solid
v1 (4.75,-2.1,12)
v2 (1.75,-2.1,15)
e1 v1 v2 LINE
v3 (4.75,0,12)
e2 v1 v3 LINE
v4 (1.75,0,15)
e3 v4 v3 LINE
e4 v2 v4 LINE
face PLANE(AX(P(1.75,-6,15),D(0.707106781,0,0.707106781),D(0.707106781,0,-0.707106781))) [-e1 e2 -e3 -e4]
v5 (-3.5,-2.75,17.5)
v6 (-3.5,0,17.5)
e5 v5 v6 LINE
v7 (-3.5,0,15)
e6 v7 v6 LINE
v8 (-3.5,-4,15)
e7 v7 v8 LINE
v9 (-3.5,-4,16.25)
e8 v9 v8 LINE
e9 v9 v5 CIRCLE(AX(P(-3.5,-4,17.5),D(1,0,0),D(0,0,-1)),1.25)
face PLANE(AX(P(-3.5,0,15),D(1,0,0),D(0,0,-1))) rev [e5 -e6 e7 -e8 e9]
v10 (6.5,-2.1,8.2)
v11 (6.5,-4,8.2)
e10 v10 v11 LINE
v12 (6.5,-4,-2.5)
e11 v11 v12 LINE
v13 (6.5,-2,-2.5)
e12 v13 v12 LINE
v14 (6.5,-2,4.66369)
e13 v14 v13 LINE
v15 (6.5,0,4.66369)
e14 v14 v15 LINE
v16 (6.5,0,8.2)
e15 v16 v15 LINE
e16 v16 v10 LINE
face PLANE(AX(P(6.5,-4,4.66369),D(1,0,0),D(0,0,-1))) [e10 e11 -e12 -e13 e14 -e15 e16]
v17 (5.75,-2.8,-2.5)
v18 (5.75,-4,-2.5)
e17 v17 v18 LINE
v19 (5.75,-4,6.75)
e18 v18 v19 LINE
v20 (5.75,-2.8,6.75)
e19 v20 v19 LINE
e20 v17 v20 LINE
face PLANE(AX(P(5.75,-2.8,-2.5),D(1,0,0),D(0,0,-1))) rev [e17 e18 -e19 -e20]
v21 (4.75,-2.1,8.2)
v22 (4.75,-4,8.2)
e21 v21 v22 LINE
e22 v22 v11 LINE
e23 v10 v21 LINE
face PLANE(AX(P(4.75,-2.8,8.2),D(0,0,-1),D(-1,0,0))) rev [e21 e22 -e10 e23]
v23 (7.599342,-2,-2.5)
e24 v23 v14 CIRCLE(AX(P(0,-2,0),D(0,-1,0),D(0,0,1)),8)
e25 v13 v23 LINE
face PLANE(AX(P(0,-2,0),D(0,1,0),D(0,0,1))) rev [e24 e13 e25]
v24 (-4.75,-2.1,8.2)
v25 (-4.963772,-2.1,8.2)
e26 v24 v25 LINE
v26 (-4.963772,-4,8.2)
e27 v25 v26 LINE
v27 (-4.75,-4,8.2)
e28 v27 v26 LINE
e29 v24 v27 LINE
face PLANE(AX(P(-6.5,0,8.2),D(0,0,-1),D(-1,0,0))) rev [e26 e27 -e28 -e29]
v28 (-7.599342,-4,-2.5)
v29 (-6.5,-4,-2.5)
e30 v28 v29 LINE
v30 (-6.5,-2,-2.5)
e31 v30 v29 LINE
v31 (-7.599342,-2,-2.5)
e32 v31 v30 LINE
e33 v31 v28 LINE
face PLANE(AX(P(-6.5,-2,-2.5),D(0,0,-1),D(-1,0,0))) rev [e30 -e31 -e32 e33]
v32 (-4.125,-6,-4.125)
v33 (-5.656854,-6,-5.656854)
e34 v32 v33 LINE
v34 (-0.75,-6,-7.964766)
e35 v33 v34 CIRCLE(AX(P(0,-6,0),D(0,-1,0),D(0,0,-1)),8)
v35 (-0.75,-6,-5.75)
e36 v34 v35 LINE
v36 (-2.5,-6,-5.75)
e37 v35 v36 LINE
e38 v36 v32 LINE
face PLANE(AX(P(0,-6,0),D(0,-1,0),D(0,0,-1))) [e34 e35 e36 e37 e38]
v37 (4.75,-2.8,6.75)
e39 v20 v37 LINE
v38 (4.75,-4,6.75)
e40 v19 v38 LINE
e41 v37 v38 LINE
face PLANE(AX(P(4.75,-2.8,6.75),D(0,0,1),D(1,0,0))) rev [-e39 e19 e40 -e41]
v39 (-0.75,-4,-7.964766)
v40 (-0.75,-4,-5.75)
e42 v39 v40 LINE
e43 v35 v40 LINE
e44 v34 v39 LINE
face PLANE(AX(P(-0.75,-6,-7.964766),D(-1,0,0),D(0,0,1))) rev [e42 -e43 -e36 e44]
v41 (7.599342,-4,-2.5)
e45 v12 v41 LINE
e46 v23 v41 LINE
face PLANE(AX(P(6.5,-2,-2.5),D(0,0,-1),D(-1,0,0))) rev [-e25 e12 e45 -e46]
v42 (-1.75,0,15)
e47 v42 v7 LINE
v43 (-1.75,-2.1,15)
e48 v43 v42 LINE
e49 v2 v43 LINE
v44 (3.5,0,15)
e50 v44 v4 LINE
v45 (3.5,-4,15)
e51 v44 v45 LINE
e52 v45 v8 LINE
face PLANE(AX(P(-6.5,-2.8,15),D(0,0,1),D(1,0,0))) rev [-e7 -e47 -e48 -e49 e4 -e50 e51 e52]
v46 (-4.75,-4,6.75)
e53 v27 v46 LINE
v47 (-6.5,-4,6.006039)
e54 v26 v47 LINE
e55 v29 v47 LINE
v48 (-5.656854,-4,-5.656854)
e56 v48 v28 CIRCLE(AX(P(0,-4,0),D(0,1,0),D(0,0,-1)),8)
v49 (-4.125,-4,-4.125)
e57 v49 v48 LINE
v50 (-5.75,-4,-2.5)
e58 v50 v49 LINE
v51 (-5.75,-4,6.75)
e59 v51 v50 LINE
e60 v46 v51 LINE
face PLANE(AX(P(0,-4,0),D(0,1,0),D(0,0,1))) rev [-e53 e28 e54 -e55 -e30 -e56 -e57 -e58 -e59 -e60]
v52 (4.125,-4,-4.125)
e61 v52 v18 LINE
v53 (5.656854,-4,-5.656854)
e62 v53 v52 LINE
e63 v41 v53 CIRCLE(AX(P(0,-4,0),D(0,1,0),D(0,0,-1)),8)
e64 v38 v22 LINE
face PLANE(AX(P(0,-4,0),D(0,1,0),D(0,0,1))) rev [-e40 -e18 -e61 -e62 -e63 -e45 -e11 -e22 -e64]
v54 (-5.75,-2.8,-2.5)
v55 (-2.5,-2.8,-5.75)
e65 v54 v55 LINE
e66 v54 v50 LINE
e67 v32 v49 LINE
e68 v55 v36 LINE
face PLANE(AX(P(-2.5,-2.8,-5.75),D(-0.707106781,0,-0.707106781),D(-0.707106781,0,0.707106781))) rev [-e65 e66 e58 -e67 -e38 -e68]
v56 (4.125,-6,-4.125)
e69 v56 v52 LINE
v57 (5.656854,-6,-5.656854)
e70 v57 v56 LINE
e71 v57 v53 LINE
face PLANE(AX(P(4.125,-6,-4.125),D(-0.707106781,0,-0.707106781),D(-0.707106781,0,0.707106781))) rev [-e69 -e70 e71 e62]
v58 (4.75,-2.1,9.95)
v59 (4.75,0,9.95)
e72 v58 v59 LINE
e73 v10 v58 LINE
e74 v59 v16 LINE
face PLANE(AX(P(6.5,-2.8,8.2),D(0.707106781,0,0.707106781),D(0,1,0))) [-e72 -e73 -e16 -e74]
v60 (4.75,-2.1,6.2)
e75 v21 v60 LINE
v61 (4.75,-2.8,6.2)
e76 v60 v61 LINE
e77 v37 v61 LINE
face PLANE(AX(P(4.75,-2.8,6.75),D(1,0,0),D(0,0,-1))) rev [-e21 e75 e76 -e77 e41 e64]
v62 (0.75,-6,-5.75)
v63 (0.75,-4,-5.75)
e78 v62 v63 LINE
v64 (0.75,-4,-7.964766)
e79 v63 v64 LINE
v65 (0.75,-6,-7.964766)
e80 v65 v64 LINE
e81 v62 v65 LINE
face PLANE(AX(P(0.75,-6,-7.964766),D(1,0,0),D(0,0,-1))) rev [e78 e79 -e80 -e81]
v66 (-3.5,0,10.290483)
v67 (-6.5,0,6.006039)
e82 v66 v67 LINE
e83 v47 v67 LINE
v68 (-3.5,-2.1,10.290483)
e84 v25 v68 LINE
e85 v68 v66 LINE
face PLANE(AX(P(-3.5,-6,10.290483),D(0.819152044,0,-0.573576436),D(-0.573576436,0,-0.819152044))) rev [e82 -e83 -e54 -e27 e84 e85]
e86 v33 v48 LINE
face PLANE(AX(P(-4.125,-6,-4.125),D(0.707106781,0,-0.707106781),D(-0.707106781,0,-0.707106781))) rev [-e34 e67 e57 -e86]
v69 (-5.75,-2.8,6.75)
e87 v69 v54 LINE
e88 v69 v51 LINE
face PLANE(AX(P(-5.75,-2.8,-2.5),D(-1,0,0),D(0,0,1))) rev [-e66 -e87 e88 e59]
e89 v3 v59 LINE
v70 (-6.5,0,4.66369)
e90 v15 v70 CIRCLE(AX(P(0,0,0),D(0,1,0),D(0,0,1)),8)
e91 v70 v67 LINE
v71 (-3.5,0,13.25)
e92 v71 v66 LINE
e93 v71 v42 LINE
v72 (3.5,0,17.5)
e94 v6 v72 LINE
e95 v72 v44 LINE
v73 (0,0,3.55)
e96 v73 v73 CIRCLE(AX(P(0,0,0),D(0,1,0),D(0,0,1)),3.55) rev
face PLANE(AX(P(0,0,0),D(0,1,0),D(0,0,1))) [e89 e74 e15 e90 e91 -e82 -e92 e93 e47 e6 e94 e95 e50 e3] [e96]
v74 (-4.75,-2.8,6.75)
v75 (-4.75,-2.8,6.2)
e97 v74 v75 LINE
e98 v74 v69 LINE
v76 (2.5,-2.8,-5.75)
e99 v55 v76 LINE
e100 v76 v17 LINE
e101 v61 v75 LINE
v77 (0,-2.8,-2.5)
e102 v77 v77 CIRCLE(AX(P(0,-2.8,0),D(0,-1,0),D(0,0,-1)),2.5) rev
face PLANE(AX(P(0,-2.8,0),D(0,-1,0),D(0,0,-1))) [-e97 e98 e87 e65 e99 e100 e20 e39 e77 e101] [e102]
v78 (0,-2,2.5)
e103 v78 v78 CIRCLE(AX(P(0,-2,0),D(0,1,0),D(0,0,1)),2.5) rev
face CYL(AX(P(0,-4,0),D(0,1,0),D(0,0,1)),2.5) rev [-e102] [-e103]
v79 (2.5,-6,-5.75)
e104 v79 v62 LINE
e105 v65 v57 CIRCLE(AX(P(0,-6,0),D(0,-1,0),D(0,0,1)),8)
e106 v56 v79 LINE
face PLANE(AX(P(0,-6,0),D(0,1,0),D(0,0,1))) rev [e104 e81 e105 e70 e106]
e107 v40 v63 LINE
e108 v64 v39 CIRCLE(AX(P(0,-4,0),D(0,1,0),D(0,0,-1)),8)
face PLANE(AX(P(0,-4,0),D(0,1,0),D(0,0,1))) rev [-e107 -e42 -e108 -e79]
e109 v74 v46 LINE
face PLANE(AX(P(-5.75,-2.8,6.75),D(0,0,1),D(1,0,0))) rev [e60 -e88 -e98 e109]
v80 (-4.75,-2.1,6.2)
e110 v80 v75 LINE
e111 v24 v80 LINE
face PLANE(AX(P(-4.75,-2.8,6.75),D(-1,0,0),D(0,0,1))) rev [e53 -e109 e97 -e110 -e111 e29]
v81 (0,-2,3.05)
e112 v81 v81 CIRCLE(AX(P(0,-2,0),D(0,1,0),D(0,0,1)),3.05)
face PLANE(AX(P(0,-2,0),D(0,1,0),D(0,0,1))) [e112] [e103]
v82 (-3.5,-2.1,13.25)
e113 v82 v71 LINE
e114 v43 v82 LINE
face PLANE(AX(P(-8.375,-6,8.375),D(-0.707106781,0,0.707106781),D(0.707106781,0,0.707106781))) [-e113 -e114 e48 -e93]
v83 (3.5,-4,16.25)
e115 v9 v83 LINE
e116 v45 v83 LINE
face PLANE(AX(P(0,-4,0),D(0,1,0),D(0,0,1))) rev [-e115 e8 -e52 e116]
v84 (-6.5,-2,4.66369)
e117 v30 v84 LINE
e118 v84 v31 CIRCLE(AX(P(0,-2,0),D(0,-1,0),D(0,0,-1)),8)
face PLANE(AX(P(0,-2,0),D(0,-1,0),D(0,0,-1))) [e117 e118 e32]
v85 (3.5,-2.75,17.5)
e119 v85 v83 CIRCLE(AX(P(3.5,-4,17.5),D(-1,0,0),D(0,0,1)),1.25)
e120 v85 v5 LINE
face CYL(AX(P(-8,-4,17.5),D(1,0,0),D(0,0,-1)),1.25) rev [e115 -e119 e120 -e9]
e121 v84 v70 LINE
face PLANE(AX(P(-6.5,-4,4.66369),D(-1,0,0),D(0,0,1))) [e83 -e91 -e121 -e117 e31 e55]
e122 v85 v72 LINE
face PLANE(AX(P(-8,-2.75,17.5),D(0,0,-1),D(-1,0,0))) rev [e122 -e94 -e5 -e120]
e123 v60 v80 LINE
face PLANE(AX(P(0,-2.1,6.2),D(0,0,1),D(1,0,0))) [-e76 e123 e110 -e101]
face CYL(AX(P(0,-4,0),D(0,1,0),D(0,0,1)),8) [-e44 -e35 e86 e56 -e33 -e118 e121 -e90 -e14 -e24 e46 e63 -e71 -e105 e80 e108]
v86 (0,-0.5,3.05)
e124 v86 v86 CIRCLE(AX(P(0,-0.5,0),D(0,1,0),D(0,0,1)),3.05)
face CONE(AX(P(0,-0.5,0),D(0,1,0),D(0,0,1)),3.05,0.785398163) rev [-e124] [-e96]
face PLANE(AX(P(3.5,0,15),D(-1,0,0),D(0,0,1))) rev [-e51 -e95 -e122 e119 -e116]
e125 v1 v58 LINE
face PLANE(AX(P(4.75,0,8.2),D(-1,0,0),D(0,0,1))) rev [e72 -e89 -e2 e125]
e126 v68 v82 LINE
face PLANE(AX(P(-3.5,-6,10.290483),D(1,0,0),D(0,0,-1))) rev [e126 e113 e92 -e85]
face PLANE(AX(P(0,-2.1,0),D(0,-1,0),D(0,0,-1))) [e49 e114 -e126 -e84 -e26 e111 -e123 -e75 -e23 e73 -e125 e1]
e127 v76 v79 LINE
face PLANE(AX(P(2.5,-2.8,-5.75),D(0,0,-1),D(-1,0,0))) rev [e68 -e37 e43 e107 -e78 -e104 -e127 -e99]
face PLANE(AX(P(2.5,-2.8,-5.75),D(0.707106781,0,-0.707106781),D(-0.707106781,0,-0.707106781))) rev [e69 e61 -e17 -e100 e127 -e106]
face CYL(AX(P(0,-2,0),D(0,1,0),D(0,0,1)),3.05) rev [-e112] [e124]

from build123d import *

# Parameters (mm, degrees)
BOSS_EXTRUDE1_DEPTH      = 4
SKETCH2_R                = 2.5
CUT_EXTRUDE1_DEPTH       = 22.9089023
SKETCH3_R                = 3.05
CUT_EXTRUDE2_DEPTH       = 2
CUT_EXTRUDE3_DEPTH       = 1.2
CUT_EXTRUDE5_DEPTH       = 0.7
CUT_EXTRUDE8_START       = -2
CUT_EXTRUDE8_DEPTH       = 2
BOSS_EXTRUDE3_DEPTH      = 2
BOSS_EXTRUDE4_DEPTH      = 1.9
CUT_EXTRUDE10_DEPTH      = 22.9089023
CUT_EXTRUDE10_DEPTH_BACK = 22.9089023
CUT_EXTRUDE11_DEPTH      = 23.360679775
CUT_EXTRUDE12_DEPTH      = 24.837994882
CUT_EXTRUDE12_DEPTH_BACK = 24.837994882
CHAMFER1_SIZE            = 1.75
CUT_EXTRUDE13_DEPTH      = 24.837994882
CUT_EXTRUDE14_DEPTH      = 21.155644371
CHAMFER2_SIZE            = 0.5


with BuildPart() as part:
    # Sketch1 → Boss-Extrude1 (new body)
    with BuildSketch(Plane(origin=(0, 0, 0), x_dir=(1, 0, 0), z_dir=(0, 1, 0))):
        with BuildLine():
            Line((-6.5, -20), (6.5, -20))
            Line((6.5, -20), (6.5, -4.663689527))
            ThreePointArc((6.5, -4.663689527), (8, 0), (6.5, 4.663689527))
            ThreePointArc((6.5, 4.663689527), (0, 8), (-6.5, 4.663689527))
            ThreePointArc((-6.5, 4.663689527), (-8, 0), (-6.5, -4.663689527))
            Line((-6.5, -4.663689527), (-6.5, -20))
        make_face()
    extrude(amount=-BOSS_EXTRUDE1_DEPTH)

    # Sketch2 → Cut-Extrude1 (cut, through all)
    with BuildSketch(Plane(origin=(0, 0, 0), x_dir=(1, 0, 0), z_dir=(0, 1, 0))):
        with Locations(Location((0, 0, 0), (0, 0, 270))):
            Circle(SKETCH2_R)
    extrude(amount=-CUT_EXTRUDE1_DEPTH, mode=Mode.SUBTRACT)

    # Sketch3 → Cut-Extrude2 (cut)
    with BuildSketch(Plane(origin=(0, 0, 0), x_dir=(1, 0, 0), z_dir=(0, 1, 0))):
        with Locations(Location((0, 0, 0), (0, 0, 270))):
            Circle(SKETCH3_R)
    extrude(amount=-CUT_EXTRUDE2_DEPTH, mode=Mode.SUBTRACT)

    # Sketch4 → Cut-Extrude3 (cut)
    with BuildSketch(Plane.XZ.offset(4)):
        Polygon((2.5, -5.75), (-2.5, -5.75), (-5.75, -2.5), (-5.75, 6.75), (-4.75, 6.75), (-4.75, 8.2), (-6.010373569, 10), (-6.5, 10), (-6.5, 10.699259012), (-6.5, 15), (6.5, 15), (6.5, 10.699259012), (6.5, 10), (6.5, 8.2), (4.75, 8.2), (4.75, 6.75), (5.75, 6.75), (5.75, -2.5), align=None)
    extrude(amount=-CUT_EXTRUDE3_DEPTH, mode=Mode.SUBTRACT)

    # Sketch6 → Cut-Extrude5 (cut)
    with BuildSketch(Plane.XZ.offset(2.8)):
        Polygon((6.5, 8.2), (6.5, 15), (-6.5, 15), (-6.5, 10.699259012), (-6.010373569, 10), (-4.75, 8.2), (-4.75, 6.2), (4.75, 6.2), (4.75, 8.2), align=None)
    extrude(amount=-CUT_EXTRUDE5_DEPTH, mode=Mode.SUBTRACT)

    # Sketch10 → Cut-Extrude8 (cut)
    with BuildSketch(Plane.XZ.offset(4).offset(CUT_EXTRUDE8_START)):
        with BuildLine():
            Line((-6.5, 4.663689527), (-6.5, -2.5))
            Line((-6.5, -2.5), (-7.599342077, -2.5))
            ThreePointArc((-7.599342077, -2.5), (-7.907431546, 1.213476964), (-6.5, 4.663689527))
        make_face()
        with BuildLine():
            Line((6.5, 4.663689527), (6.5, -2.5))
            Line((6.5, -2.5), (7.599342077, -2.5))
            ThreePointArc((7.599342077, -2.5), (7.907431546, 1.213476964), (6.5, 4.663689527))
        make_face()
    extrude(amount=CUT_EXTRUDE8_DEPTH, mode=Mode.SUBTRACT)

    # Sketch11 → Boss-Extrude3 (add)
    with BuildSketch(Plane.XZ.offset(4)):
        with BuildLine():
            Line((-0.75, -7.964766161), (-0.75, -5.75))
            Line((-0.75, -5.75), (-2.5, -5.75))
            Line((-2.5, -5.75), (-4.125, -4.125))
            Line((-4.125, -4.125), (-5.656854249, -5.656854249))
            ThreePointArc((-5.656854249, -5.656854249), (-3.404931672, -7.239229262), (-0.75, -7.964766161))
        make_face()
        with BuildLine():
            Line((0.75, -7.964766161), (0.75, -5.75))
            Line((0.75, -5.75), (2.5, -5.75))
            Line((2.5, -5.75), (4.125, -4.125))
            Line((4.125, -4.125), (5.656854249, -5.656854249))
            ThreePointArc((5.656854249, -5.656854249), (3.404931672, -7.239229262), (0.75, -7.964766161))
        make_face()
    extrude(amount=BOSS_EXTRUDE3_DEPTH)

    # Sketch14 → Boss-Extrude4 (add)
    with BuildSketch(Plane.XZ.offset(2.1)):
        Polygon((-4.75, 8.2), (-6.010373569, 10), (-6.5, 10), (-6.5, 15), (-4.75, 15), align=None)
    extrude(amount=BOSS_EXTRUDE4_DEPTH)

    # Sketch15 → Cut-Extrude10 (cut, two sides: drawn at the far end of the back side and taken through both)
    with BuildSketch(Plane.XZ.offset(4).offset(-CUT_EXTRUDE10_DEPTH_BACK)):
        Polygon((-6.5, 15), (-6.5, 8.2), (-4.75, 8.2), (-4.75, 15), (-3.5, 15), (-3.5, 20), (-6.5, 20), align=None)
        Polygon((6.5, 8.2), (4.75, 8.2), (4.75, 15), (3.5, 15), (3.5, 20), (6.5, 20), (6.5, 15), align=None)
    extrude(amount=CUT_EXTRUDE10_DEPTH + CUT_EXTRUDE10_DEPTH_BACK, mode=Mode.SUBTRACT)

    # Sketch16 → Cut-Extrude11 (cut, through all)
    with BuildSketch(Plane(origin=(0, 0, 0), x_dir=(1, 0, 0), z_dir=(0, 1, 0))):
        Polygon((-1.75, -15), (-4.75, -12), (-4.75, -15), (-3.5, -15), align=None)
        Polygon((4.75, -12), (4.75, -15), (1.75, -15), align=None)
    extrude(amount=-CUT_EXTRUDE11_DEPTH, mode=Mode.SUBTRACT)

    # Sketch17 → Cut-Extrude12 (cut, two sides: drawn at the far end of the back side and taken through both)
    with BuildSketch(Plane(origin=(3.5, 0, 0), x_dir=(0, 0, -1), z_dir=(1, 0, 0)).offset(-CUT_EXTRUDE12_DEPTH_BACK)):
        with BuildLine():
            Line((-16.25, -4), (-18.75, -4))
            ThreePointArc((-18.75, -4), (-17.5, -2.75), (-16.25, -4))
        make_face()
    extrude(amount=CUT_EXTRUDE12_DEPTH + CUT_EXTRUDE12_DEPTH_BACK, mode=Mode.SUBTRACT)

    # Chamfer1
    chamfer1_edges = [part.edges().sort_by_distance(p)[0] for p in [
        (-4.75, -1.05, 8.2),
        (4.75, -1.05, 8.2),
    ]]
    chamfer(chamfer1_edges, length=CHAMFER1_SIZE - 0.0001)  # a hair under: the kernel refuses the full size

    # Sketch18 → Cut-Extrude13 (cut, through all)
    with BuildSketch(Plane(origin=(3.5, 0, 0), x_dir=(0, 0, -1), z_dir=(1, 0, 0))):
        with BuildLine():
            Line((-18.75, -4), (-20, -4))
            Line((-20, -4), (-20, 0))
            Line((-20, 0), (-18.75, 0))
            Line((-18.75, 0), (-17.5, 0))
            Line((-17.5, 0), (-17.5, -2.75))
            ThreePointArc((-17.5, -2.75), (-18.383883476, -3.116116524), (-18.75, -4))
        make_face()
    extrude(amount=-CUT_EXTRUDE13_DEPTH, mode=Mode.SUBTRACT)

    # Sketch19 → Cut-Extrude14 (cut, through all)
    with BuildSketch(Plane(origin=(0, 0, 0), x_dir=(1, 0, 0), z_dir=(0, 1, 0))):
        Polygon((-3.5, -10.290482648), (-6.5, -6.006038628), (-6.5, -13.25), (-3.5, -13.25), align=None)
    extrude(amount=-CUT_EXTRUDE14_DEPTH, mode=Mode.SUBTRACT)

    # Chamfer2
    chamfer2_edges = [part.edges().sort_by_distance(p)[0] for p in [
        (0, 0, -3.05),
    ]]
    chamfer(chamfer2_edges, length=CHAMFER2_SIZE)


solid = part.part
